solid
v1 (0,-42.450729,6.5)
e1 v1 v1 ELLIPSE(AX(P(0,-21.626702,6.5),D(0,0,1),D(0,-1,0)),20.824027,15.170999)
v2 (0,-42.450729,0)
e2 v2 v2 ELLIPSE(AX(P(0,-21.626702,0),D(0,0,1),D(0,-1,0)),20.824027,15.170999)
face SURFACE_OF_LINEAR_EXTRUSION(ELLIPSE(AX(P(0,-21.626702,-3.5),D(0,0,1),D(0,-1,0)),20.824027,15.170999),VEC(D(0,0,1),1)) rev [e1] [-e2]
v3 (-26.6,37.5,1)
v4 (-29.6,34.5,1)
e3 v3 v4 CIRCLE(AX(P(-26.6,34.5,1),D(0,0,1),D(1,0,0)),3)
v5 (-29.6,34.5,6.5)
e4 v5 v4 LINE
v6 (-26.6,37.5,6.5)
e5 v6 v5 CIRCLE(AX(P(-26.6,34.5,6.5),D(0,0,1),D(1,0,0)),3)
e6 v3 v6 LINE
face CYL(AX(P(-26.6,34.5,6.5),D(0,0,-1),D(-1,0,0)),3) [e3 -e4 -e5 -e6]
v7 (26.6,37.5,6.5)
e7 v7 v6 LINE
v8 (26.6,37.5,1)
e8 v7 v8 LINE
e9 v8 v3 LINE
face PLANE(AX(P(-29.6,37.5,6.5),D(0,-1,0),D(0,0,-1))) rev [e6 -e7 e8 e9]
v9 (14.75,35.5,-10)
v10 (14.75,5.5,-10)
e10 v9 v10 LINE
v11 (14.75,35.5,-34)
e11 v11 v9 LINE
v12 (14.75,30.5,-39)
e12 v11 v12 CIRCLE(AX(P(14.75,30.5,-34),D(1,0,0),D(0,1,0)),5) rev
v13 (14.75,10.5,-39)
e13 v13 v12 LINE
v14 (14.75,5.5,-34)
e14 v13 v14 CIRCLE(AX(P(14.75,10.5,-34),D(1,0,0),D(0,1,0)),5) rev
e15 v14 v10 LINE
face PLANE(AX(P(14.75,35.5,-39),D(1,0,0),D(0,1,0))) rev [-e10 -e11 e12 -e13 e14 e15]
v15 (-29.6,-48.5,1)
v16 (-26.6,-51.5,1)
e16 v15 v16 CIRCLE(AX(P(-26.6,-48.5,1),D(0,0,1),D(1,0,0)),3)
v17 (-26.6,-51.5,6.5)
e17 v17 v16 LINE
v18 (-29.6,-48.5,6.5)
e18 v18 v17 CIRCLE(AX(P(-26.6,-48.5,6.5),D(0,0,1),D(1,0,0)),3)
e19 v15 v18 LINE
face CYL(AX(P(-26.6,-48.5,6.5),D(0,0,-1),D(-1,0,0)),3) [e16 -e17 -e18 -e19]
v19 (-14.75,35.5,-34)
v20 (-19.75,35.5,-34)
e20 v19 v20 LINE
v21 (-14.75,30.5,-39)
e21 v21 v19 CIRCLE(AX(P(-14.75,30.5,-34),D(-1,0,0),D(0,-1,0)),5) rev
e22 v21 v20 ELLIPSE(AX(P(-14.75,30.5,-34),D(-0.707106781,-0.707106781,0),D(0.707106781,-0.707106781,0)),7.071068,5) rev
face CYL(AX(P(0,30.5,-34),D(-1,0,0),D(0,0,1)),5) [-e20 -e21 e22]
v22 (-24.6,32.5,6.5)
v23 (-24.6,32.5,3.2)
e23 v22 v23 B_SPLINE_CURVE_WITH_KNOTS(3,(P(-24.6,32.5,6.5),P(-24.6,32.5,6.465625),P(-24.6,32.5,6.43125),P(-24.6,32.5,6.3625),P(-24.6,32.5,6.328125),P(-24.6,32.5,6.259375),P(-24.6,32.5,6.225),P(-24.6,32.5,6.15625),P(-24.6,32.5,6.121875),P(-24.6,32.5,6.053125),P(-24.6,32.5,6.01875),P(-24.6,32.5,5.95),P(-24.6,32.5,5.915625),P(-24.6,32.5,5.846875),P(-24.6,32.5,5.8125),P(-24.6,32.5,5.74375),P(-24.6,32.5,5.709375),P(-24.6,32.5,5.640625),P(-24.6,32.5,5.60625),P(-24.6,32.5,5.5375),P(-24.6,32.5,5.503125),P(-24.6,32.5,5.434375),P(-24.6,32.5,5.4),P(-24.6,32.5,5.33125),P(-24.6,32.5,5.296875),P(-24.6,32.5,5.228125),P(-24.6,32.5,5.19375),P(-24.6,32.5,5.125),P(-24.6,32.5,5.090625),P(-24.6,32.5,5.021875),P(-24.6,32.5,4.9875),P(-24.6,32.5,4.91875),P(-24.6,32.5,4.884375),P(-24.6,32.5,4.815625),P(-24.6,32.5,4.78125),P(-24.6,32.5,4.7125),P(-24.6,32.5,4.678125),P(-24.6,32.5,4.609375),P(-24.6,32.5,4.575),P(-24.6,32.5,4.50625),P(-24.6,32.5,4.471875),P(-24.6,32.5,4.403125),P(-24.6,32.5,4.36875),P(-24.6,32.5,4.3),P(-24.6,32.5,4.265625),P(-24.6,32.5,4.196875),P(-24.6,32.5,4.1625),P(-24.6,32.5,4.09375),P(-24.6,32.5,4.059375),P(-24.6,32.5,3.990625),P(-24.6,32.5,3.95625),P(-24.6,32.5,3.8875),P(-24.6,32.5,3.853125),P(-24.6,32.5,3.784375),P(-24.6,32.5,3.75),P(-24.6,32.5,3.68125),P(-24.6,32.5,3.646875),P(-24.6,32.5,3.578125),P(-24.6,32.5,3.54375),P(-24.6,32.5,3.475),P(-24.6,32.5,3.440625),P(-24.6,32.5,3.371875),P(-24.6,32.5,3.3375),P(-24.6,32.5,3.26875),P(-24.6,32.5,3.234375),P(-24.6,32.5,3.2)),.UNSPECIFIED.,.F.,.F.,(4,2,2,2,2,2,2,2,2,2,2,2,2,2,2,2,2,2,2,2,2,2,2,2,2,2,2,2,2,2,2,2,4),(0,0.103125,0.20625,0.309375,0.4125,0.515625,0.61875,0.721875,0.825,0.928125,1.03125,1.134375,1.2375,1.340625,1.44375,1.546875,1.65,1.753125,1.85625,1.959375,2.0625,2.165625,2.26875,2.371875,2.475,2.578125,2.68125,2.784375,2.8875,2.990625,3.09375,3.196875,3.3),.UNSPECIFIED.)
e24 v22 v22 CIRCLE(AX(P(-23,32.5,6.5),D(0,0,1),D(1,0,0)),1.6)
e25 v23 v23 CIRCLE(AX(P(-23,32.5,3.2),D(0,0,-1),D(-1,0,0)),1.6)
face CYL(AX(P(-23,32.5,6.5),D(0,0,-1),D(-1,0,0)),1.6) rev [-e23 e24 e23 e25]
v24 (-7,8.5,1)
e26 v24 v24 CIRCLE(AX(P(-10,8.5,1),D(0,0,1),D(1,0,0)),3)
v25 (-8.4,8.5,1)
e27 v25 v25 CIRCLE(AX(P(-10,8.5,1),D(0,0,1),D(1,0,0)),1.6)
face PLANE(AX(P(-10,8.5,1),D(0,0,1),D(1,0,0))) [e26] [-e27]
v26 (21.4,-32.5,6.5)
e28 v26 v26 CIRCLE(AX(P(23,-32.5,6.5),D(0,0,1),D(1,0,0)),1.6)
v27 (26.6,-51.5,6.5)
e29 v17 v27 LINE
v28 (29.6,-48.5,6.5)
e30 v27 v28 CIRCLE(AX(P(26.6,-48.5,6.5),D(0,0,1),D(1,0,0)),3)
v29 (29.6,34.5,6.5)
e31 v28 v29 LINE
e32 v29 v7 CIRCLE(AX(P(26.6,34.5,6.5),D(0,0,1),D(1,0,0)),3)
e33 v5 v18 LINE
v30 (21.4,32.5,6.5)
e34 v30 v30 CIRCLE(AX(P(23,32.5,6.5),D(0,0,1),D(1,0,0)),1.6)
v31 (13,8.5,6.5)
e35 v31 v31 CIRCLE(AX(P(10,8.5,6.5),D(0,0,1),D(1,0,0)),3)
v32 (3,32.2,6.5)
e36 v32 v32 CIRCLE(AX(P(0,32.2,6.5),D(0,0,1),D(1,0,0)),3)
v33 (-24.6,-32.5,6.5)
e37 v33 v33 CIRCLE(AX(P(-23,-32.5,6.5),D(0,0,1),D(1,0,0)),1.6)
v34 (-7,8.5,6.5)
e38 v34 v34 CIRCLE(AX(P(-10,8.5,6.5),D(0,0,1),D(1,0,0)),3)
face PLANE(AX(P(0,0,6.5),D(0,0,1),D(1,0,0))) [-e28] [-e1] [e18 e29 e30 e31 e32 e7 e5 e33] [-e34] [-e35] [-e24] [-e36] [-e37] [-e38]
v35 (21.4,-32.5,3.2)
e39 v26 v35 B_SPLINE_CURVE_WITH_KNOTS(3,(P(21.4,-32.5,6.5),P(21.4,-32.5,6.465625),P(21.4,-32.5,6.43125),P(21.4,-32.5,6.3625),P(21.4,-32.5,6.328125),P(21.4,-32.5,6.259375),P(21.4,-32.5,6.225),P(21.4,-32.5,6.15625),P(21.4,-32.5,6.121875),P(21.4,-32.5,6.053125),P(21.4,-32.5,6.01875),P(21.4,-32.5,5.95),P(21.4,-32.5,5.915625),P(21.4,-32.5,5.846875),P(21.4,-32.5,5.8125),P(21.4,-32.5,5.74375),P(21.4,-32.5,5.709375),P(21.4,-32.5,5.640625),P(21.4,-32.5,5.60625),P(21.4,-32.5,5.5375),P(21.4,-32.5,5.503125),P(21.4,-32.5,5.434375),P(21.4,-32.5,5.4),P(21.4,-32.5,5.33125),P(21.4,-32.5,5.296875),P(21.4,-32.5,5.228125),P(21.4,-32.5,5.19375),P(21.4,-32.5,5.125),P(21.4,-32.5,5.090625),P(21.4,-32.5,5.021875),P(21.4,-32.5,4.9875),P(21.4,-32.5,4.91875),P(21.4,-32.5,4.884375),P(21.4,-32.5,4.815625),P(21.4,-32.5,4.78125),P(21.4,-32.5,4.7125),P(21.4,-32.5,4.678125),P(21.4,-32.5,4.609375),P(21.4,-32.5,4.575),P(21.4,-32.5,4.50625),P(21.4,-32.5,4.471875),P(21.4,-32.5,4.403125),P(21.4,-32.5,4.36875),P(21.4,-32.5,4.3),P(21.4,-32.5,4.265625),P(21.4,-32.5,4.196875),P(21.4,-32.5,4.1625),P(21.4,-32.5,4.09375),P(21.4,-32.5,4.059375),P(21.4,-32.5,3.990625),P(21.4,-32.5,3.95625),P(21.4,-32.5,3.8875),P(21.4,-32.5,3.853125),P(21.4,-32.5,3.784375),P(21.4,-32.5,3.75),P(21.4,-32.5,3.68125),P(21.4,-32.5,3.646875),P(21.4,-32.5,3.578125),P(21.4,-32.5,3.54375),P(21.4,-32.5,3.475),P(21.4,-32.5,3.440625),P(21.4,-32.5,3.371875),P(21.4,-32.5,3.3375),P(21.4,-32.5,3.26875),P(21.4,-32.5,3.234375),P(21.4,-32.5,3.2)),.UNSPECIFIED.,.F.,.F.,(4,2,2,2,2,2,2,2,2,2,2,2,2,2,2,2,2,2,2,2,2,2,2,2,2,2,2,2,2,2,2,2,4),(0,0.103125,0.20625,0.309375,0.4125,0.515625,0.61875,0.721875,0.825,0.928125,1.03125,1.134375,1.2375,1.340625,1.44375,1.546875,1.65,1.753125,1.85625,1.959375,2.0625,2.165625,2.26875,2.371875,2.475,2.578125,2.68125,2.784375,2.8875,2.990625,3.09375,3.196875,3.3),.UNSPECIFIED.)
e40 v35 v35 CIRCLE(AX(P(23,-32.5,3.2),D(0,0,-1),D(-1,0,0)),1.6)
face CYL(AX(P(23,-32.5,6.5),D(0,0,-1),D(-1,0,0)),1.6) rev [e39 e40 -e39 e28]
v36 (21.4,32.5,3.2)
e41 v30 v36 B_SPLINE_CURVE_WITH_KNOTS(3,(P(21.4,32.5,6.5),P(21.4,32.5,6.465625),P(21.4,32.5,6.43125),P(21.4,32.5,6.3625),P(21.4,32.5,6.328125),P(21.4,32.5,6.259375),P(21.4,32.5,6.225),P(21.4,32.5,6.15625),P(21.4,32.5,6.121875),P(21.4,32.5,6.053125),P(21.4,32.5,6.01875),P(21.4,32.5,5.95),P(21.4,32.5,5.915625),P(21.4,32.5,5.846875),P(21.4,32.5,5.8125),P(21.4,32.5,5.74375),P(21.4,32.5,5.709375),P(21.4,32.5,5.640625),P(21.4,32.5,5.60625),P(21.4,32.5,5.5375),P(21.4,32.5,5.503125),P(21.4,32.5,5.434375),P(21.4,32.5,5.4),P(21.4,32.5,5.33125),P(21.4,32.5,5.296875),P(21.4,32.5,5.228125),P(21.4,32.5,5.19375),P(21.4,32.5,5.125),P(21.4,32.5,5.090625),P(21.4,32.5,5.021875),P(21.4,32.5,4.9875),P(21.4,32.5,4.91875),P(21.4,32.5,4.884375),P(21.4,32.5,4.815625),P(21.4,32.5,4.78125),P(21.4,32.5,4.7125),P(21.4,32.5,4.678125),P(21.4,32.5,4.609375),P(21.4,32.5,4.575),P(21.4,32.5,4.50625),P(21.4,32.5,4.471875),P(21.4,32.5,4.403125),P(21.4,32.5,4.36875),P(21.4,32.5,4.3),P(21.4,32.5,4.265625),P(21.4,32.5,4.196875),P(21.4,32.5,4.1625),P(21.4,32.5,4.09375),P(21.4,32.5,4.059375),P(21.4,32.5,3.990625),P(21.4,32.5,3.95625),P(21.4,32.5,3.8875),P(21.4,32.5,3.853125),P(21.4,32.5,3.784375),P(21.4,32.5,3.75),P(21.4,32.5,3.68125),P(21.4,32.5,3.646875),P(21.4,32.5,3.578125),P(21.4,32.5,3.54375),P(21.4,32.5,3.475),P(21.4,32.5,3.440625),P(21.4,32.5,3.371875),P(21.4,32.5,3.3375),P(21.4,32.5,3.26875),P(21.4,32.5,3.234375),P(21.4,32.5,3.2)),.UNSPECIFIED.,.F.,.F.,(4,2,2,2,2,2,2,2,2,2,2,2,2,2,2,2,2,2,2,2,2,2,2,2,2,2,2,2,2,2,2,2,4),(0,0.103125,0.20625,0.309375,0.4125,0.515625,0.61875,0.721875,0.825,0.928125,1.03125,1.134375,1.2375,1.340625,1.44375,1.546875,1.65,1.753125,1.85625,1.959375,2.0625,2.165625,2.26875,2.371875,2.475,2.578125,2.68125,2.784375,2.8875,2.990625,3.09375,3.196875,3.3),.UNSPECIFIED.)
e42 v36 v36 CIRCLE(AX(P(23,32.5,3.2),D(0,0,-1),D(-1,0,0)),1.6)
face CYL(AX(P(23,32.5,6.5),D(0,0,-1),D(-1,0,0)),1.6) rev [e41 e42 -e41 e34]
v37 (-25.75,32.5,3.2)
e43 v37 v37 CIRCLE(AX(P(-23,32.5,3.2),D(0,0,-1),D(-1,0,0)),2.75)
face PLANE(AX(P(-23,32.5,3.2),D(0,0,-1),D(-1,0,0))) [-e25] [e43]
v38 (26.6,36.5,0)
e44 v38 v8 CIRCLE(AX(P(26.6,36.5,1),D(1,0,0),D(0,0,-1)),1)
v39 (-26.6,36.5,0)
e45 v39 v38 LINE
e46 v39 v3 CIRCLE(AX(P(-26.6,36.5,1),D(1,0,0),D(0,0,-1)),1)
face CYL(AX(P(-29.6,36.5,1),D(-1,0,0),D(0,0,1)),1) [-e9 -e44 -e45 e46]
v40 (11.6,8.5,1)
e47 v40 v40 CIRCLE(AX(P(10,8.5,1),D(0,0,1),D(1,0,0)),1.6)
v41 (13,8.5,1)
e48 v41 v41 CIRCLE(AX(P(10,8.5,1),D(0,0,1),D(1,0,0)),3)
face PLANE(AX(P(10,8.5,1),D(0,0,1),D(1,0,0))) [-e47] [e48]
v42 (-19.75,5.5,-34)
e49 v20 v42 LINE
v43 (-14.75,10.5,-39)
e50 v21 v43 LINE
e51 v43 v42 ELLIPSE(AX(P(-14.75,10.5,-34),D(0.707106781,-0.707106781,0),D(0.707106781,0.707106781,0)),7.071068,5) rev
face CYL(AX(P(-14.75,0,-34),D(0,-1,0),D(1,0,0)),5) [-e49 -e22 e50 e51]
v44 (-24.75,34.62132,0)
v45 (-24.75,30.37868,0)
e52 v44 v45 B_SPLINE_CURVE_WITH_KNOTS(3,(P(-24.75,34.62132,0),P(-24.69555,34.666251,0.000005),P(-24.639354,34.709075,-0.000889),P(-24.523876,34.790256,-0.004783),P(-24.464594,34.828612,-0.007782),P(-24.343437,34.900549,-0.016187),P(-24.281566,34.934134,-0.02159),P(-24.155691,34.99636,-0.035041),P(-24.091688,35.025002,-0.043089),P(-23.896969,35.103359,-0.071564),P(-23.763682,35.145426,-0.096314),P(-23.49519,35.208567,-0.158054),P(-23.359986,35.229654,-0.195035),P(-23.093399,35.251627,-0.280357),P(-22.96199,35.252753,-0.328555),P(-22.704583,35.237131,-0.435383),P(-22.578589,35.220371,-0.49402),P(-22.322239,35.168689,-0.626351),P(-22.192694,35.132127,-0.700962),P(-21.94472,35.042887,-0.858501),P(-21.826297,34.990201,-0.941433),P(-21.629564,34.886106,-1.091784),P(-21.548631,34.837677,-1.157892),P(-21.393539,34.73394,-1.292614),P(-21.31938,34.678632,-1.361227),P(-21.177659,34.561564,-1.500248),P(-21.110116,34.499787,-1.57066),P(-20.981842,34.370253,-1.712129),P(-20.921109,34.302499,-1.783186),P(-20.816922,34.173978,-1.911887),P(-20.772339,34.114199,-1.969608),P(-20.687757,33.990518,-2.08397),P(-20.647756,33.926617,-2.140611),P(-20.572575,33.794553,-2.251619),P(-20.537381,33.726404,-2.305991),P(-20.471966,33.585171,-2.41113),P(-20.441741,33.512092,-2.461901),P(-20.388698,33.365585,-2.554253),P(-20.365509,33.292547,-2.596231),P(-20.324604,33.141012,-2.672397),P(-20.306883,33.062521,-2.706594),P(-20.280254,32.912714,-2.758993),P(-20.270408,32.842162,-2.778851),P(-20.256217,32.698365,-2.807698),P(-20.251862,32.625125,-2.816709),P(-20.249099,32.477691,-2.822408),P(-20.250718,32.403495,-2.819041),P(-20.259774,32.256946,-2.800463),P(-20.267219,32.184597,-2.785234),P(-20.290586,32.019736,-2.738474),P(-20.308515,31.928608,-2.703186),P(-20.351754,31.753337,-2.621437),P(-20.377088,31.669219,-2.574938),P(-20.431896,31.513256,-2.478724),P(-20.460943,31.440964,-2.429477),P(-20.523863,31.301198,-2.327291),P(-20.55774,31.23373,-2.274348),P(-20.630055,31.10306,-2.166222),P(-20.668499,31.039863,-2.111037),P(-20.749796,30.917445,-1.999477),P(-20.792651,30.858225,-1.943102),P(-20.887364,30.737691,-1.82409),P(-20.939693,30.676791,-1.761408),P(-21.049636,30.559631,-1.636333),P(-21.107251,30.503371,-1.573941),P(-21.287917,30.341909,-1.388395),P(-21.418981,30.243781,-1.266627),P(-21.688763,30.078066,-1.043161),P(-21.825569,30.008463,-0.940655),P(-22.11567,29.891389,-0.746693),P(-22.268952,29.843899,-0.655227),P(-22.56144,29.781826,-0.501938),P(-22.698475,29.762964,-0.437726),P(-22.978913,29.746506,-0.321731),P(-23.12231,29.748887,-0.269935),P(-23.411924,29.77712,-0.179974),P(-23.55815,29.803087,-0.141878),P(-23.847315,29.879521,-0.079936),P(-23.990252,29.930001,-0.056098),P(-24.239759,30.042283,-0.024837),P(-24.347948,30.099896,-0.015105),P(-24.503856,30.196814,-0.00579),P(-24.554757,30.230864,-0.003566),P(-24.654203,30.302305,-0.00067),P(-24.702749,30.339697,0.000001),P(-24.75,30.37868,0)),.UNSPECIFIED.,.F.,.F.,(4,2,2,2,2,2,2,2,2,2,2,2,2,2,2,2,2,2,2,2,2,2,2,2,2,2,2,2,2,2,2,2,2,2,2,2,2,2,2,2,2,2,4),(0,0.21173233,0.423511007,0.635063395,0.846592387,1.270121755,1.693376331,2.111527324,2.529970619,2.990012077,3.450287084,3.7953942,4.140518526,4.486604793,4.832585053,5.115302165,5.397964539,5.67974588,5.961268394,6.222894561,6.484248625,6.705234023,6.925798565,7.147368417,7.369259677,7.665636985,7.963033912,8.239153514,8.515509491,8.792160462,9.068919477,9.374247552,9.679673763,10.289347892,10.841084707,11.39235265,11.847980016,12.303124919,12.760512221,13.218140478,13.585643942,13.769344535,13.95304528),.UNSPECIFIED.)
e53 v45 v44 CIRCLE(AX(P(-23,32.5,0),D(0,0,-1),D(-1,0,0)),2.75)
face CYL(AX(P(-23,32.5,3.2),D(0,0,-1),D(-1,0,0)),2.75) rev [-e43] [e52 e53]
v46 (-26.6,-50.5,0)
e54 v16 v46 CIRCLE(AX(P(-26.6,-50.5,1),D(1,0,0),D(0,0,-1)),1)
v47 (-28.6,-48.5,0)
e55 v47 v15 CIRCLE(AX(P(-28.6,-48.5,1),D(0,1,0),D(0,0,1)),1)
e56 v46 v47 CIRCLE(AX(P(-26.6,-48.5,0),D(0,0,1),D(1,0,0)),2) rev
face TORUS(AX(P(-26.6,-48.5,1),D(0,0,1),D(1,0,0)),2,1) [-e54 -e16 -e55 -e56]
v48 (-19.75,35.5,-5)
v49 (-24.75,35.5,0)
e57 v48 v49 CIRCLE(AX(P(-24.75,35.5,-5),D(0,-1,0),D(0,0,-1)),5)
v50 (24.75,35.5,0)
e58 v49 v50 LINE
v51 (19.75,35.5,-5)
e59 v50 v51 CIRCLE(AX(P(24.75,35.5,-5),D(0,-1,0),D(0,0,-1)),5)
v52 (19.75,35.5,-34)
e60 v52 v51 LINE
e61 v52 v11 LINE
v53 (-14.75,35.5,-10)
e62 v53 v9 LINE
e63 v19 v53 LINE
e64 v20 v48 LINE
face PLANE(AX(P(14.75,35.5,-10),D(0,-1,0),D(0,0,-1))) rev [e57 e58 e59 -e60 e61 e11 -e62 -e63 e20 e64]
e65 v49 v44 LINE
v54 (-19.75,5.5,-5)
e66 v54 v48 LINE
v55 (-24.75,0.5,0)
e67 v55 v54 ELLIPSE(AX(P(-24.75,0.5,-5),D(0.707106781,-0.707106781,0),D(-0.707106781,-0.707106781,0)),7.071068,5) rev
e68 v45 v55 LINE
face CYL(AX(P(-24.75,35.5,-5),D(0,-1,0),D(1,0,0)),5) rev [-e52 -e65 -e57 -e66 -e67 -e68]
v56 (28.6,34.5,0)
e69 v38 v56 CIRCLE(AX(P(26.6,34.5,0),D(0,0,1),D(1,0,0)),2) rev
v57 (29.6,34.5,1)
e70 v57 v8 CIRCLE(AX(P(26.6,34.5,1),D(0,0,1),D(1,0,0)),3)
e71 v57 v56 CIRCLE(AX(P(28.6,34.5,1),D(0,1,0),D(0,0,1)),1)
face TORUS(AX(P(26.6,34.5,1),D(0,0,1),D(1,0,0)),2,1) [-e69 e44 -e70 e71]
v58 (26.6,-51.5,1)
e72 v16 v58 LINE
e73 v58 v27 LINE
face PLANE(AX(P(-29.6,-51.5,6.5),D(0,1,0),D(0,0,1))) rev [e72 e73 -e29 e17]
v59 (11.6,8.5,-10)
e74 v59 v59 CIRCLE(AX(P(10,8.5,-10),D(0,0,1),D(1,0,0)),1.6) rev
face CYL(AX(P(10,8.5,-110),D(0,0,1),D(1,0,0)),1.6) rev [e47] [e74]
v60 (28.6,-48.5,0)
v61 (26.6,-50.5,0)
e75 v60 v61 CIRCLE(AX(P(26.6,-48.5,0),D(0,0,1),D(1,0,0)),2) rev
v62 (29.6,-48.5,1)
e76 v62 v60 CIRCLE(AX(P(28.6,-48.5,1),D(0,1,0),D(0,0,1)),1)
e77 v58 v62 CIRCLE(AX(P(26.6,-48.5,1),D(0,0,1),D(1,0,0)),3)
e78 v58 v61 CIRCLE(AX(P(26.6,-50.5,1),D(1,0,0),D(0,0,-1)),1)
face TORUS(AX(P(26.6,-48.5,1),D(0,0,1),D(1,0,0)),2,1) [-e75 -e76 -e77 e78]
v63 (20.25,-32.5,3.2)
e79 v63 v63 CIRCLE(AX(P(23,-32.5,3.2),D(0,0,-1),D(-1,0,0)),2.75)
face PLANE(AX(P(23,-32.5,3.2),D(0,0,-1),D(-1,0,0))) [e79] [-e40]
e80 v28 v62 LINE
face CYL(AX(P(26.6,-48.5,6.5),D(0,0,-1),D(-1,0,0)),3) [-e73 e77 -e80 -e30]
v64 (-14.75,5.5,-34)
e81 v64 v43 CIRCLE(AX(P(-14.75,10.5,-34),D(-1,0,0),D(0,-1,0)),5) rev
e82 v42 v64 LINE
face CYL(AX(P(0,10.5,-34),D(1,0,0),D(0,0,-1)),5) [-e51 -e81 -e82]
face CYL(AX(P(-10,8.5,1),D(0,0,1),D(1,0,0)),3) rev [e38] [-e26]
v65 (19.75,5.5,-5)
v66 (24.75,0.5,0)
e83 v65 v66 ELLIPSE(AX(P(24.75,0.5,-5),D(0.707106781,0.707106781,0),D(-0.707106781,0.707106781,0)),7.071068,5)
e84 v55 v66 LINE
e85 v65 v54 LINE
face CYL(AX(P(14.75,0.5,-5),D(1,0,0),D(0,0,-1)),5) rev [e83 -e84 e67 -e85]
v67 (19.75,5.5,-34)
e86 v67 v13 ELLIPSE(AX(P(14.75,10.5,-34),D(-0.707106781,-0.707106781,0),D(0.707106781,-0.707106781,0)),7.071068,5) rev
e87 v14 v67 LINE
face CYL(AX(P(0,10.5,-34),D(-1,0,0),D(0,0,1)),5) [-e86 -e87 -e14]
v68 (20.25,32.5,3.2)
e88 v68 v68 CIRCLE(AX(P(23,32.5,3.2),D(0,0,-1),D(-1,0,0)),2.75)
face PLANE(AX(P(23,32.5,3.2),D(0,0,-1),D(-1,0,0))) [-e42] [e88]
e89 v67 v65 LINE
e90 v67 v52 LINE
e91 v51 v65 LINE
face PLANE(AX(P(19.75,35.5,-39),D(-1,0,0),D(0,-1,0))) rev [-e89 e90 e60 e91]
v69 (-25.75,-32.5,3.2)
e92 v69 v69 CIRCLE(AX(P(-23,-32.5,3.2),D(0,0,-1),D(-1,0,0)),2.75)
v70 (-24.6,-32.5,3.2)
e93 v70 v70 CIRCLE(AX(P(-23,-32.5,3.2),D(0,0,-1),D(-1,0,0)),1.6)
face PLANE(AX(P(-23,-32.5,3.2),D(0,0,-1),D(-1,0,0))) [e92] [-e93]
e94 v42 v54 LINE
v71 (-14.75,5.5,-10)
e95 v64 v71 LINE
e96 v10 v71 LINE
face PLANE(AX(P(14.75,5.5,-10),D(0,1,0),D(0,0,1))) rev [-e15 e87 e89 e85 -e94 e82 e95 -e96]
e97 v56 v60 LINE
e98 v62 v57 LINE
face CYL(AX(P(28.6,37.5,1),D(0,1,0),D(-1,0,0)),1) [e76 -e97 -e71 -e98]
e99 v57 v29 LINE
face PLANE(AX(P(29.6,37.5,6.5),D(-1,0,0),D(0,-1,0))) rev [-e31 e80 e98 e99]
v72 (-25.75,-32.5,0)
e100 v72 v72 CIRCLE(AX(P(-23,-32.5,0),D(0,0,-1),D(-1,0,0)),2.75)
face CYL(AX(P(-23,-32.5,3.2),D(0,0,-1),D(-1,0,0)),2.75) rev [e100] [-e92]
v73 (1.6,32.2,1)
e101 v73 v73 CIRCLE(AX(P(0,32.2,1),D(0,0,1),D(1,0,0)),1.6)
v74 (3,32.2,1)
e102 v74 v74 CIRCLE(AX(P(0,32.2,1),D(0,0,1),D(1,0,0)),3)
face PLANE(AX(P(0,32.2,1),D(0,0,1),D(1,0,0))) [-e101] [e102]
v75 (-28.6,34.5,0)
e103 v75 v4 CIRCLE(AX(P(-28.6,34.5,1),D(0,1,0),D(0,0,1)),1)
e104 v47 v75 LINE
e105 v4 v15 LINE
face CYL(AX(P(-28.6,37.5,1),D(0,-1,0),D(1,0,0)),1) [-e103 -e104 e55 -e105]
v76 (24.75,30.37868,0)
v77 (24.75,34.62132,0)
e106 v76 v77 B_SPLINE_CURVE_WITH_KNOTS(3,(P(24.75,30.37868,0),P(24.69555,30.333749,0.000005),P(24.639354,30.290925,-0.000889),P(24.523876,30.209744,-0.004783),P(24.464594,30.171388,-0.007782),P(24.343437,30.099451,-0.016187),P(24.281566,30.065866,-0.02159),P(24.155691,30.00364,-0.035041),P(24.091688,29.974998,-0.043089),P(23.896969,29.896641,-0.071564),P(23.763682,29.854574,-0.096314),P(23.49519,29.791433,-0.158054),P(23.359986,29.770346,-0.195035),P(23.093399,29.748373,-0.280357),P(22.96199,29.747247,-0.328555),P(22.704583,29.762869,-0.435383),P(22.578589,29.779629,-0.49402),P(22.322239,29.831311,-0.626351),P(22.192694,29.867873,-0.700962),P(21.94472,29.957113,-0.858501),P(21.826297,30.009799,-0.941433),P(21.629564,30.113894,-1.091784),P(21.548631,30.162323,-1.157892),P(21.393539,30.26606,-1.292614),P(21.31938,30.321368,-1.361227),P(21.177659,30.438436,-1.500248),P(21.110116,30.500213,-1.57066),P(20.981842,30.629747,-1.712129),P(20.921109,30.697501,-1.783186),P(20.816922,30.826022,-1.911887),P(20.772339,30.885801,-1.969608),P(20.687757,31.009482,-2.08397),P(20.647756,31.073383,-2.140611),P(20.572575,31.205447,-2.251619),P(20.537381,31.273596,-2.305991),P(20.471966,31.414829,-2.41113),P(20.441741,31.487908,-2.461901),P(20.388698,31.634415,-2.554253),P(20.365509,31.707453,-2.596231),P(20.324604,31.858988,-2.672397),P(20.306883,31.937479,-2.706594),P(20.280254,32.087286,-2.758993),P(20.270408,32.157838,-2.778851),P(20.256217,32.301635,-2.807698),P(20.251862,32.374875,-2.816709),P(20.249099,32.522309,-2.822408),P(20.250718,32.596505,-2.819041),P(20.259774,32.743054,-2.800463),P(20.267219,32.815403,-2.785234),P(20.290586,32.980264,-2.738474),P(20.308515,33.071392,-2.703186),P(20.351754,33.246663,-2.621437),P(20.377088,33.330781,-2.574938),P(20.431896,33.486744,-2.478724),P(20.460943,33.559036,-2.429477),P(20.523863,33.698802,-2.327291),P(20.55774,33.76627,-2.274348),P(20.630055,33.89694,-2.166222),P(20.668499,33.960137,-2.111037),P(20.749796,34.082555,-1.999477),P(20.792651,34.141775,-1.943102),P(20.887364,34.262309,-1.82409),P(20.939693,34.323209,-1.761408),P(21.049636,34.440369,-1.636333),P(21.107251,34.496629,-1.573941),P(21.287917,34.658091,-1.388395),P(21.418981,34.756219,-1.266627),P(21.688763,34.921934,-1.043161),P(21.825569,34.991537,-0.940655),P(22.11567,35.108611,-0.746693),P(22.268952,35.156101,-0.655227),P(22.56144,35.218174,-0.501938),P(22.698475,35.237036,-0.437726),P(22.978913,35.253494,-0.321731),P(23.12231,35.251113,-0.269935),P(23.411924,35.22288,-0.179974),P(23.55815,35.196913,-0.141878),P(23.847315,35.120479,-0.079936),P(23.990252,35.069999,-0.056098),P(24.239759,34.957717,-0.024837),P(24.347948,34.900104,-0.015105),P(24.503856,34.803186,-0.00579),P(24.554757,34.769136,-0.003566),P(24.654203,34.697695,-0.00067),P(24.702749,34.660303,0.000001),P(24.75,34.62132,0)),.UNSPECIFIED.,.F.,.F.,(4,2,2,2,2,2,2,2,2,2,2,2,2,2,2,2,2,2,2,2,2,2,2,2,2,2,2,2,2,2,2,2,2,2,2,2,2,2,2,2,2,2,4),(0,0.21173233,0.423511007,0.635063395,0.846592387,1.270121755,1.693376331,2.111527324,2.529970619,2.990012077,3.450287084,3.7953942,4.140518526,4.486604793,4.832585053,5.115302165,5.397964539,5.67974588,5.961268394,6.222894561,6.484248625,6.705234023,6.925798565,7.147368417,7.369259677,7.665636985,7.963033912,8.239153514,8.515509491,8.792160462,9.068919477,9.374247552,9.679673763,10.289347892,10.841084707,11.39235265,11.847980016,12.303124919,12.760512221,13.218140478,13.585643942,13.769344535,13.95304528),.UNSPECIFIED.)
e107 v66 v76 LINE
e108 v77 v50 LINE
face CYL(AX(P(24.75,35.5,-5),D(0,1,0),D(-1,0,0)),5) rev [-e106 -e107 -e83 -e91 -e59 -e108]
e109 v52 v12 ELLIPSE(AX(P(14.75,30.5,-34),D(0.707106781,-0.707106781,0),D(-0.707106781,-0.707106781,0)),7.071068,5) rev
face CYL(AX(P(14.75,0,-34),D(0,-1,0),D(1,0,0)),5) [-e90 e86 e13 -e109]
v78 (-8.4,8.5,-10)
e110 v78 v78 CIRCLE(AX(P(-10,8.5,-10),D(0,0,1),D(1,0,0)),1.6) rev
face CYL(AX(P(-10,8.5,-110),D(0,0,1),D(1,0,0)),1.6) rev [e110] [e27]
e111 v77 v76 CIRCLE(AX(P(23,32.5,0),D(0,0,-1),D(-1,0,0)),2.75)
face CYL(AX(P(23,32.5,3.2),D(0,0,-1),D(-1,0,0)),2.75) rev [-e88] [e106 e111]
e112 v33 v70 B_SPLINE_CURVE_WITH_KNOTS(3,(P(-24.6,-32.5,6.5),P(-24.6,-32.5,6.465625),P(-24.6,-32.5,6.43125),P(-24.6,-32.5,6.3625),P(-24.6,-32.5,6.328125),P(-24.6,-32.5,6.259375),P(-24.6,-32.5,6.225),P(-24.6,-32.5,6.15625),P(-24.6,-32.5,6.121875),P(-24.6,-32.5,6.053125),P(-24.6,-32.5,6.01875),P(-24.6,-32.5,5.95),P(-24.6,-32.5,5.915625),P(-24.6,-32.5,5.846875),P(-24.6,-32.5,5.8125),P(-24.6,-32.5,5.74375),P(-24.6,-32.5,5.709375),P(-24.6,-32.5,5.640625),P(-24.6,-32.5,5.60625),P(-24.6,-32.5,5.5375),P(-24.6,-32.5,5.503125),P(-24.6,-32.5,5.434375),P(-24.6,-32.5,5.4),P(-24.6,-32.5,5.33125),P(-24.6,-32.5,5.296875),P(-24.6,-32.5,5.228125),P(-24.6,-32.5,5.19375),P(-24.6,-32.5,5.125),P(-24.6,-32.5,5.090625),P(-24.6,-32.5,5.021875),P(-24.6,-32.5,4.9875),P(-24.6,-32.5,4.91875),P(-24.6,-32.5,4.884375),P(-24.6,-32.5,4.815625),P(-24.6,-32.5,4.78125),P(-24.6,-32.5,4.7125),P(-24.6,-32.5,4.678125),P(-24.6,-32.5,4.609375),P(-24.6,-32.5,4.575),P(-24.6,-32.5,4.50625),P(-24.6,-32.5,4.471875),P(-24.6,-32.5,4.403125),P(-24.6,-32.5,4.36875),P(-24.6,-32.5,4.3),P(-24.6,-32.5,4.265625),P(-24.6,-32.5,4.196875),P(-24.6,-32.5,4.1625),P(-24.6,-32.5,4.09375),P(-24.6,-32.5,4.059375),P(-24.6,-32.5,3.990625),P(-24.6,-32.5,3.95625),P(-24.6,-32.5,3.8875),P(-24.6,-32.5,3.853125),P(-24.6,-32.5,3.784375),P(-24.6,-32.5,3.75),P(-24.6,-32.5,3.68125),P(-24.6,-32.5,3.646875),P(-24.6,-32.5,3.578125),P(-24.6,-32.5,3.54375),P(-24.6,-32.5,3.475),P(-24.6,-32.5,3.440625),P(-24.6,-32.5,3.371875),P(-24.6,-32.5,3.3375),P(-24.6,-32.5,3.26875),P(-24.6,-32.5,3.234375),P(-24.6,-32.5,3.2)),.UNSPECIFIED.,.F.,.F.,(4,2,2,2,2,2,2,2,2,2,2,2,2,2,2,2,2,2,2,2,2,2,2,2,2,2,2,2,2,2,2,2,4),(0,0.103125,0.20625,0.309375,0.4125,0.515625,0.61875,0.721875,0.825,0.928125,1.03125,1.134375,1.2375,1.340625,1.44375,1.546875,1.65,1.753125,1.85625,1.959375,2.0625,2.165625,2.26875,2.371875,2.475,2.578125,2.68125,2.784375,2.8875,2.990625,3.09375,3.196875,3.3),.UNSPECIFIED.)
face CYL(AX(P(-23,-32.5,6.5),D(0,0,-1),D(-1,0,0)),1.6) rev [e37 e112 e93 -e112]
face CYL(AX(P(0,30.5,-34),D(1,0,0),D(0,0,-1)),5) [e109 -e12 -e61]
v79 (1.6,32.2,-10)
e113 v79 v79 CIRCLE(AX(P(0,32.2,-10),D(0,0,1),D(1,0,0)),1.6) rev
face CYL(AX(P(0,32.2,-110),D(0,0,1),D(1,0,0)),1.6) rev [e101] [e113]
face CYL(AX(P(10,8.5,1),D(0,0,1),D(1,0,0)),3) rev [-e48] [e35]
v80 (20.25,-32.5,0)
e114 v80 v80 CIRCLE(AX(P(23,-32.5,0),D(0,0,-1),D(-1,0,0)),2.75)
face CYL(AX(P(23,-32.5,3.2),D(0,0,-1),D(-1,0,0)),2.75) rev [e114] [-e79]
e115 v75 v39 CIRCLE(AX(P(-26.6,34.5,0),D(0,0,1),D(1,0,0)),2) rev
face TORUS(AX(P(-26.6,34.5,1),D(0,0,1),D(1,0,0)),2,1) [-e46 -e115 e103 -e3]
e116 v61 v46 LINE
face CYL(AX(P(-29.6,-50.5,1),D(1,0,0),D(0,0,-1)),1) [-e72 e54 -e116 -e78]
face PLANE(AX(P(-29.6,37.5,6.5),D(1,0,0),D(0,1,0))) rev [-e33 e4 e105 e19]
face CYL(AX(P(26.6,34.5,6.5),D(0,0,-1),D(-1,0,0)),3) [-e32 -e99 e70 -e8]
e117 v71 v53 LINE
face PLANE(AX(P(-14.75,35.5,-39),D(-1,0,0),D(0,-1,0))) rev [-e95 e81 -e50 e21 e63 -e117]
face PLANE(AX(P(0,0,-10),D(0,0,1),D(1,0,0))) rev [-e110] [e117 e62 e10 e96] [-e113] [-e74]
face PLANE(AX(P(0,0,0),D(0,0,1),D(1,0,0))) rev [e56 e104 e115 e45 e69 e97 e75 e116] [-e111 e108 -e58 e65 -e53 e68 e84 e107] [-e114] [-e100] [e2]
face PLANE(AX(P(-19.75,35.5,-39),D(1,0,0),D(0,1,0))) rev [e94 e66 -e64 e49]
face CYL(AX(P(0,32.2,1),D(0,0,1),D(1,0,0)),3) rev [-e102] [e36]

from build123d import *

# Parameters (mm, degrees)
SKETCH_1_W               = 59.2
SKETCH_1_H               = 89
SKETCH_1_R               = 1.6
EXTRUDE_1_DEPTH          = 6.5
SKETCH_2_W               = 29.5
SKETCH_2_H               = 30
EXTRUDE_2_DEPTH          = 10
SKETCH_3_W               = 5
SKETCH_3_H               = 30
EXTRUDE_3_DEPTH          = 39
SKETCH_4_R               = 2.75
CUT_EXTRUDE_1_DEPTH      = 3.2
CUT_EXTRUDE_2_DEPTH      = 100
CUT_EXTRUDE_2_DEPTH_BACK = 100
SKETCH_5_R               = 1.6
SKETCH_6_R               = 3
CUT_EXTRUDE_3_DEPTH      = 5.5
FILLET_1_R               = 3
FILLET_2_R               = 5
FILLET_5_R               = 1
FILLET_6_R               = 5
SKETCH_7_RX              = 20.824026905
SKETCH_7_RY              = 15.170998686
CUT_EXTRUDE_4_DEPTH      = 10


# Some blends are built 0.0001 mm under size
with BuildPart() as part:
    # 草图1 → 凸台-拉伸1 (new body)
    with BuildSketch(Plane.XY):
        with Locations((0, -7)):
            Rectangle(SKETCH_1_W, SKETCH_1_H)
        with Locations(Location((-23, -32.5, 0), (0, 0, 180))):
            Circle(SKETCH_1_R, mode=Mode.SUBTRACT)
        with Locations(Location((23, -32.5, 0), (0, 0, 180))):
            Circle(SKETCH_1_R, mode=Mode.SUBTRACT)
        with Locations(Location((23, 32.5, 0), (0, 0, 180))):
            Circle(SKETCH_1_R, mode=Mode.SUBTRACT)
        with Locations(Location((-23, 32.5, 0), (0, 0, 180))):
            Circle(SKETCH_1_R, mode=Mode.SUBTRACT)
    extrude(amount=EXTRUDE_1_DEPTH)

    # 草图2 → 凸台-拉伸2 (add)
    with BuildSketch(Plane(origin=(0, 0, 0), x_dir=(-1, 0, 0), z_dir=(0, 0, -1))):
        with Locations((0, 20.5)):
            Rectangle(SKETCH_2_W, SKETCH_2_H)
    extrude(amount=EXTRUDE_2_DEPTH)

    # 草图3 → 凸台-拉伸3 (add)
    with BuildSketch(Plane(origin=(0, 0, 0), x_dir=(-1, 0, 0), z_dir=(0, 0, -1))):
        with Locations((17.25, 20.5)):
            Rectangle(SKETCH_3_W, SKETCH_3_H)
        with Locations((-17.25, 20.5)):
            Rectangle(SKETCH_3_W, SKETCH_3_H)
    extrude(amount=EXTRUDE_3_DEPTH)

    # 草图4 → 切除-拉伸1 (cut)
    with BuildSketch(Plane(origin=(0, 0, 0), x_dir=(-1, 0, 0), z_dir=(0, 0, -1))):
        with Locations((23, -32.5)):
            Circle(SKETCH_4_R)
        with Locations((-23, -32.5)):
            Circle(SKETCH_4_R)
        with Locations((23, 32.5)):
            Circle(SKETCH_4_R)
        with Locations((-23, 32.5)):
            Circle(SKETCH_4_R)
    extrude(amount=-CUT_EXTRUDE_1_DEPTH, mode=Mode.SUBTRACT)

    # 草图5 → 切除-拉伸2 (cut, two sides: drawn at the far end of the back side and taken through both)
    with BuildSketch(Plane(origin=(0, 0, -10), x_dir=(-1, 0, 0), z_dir=(0, 0, -1)).offset(-CUT_EXTRUDE_2_DEPTH_BACK)):
        with Locations(Location((0, 32.2, 0), (0, 0, 180))):
            Circle(SKETCH_5_R)
        with Locations(Location((10, 8.5, 0), (0, 0, 180))):
            Circle(SKETCH_5_R)
        with Locations(Location((-10, 8.5, 0), (0, 0, 180))):
            Circle(SKETCH_5_R)
    extrude(amount=CUT_EXTRUDE_2_DEPTH + CUT_EXTRUDE_2_DEPTH_BACK, mode=Mode.SUBTRACT)

    # 草图6 → 切除-拉伸3 (cut)
    with BuildSketch(Plane.XY.offset(6.5)):
        with Locations((10, 8.5)):
            Circle(SKETCH_6_R)
        with Locations((-10, 8.5)):
            Circle(SKETCH_6_R)
        with Locations((0, 32.2)):
            Circle(SKETCH_6_R)
    extrude(amount=-CUT_EXTRUDE_3_DEPTH, mode=Mode.SUBTRACT)

    # 圆角1
    fillet_1_edges = [part.edges().sort_by_distance(p)[0] for p in [
        (29.6, -51.5, 3.25),
        (-29.6, -51.5, 3.25),
        (-29.6, 37.5, 3.25),
        (29.6, 37.5, 3.25),
    ]]
    fillet(fillet_1_edges, radius=FILLET_1_R)

    # 圆角2
    # the kernel refuses this fillet: 5 mm, written as the material it adds along each edge
    with BuildSketch(Plane(origin=(-19.75, 5.5, 0), x_dir=(0, -1, 0), z_dir=(1, 0, 0))) as fillet_2_piece_1:
        with BuildLine():
            CenterArc((FILLET_2_R, FILLET_2_R), FILLET_2_R, 180, 90)
            Line((0, FILLET_2_R), (0, 0))
            Line((0, 0), (FILLET_2_R, 0))
        make_face()
    extrude(amount=39.5)
    with BuildSketch(Plane(origin=(-19.75, 35.5, 0), x_dir=(-1, 0, 0), z_dir=(0, -1, 0))) as fillet_2_piece_2_section:
        with BuildLine():
            CenterArc((FILLET_2_R, FILLET_2_R), FILLET_2_R, 180, 90)
            Line((0, FILLET_2_R), (0, 0))
            Line((0, 0), (FILLET_2_R, 0))
        make_face()
    fillet_2_piece_2 = extrude(amount=30, mode=Mode.PRIVATE)
    fillet_2_piece_2 = fillet_2_piece_2 - Plane(origin=(-23, 32.5, -1.1830281), x_dir=(-1, 0, 0), z_dir=(0, 0, -1)) * Cylinder(2.75, 80, mode=Mode.PRIVATE)
    add(fillet_2_piece_2)
    with BuildSketch(Plane(origin=(19.75, 35.5, 0), x_dir=(1, 0, 0), z_dir=(0, -1, 0))) as fillet_2_piece_3_section:
        with BuildLine():
            CenterArc((FILLET_2_R, -FILLET_2_R), FILLET_2_R, 90, 90)
            Line((0, -FILLET_2_R), (0, 0))
            Line((0, 0), (FILLET_2_R, 0))
        make_face()
    fillet_2_piece_3 = extrude(amount=30, mode=Mode.PRIVATE)
    fillet_2_piece_3 = fillet_2_piece_3 - Plane(origin=(23, 32.5, -1.183032565), x_dir=(-1, 0, 0), z_dir=(0, 0, -1)) * Cylinder(2.75, 80, mode=Mode.PRIVATE)
    add(fillet_2_piece_3)
    with BuildSketch(Plane(origin=(-32.25, 5.5, 0), x_dir=(0, -1, 0), z_dir=(1, 0, 0))) as fillet_2_piece_4a_section:
        with BuildLine():
            CenterArc((FILLET_2_R, FILLET_2_R), FILLET_2_R, 180, 90)
            Line((0, FILLET_2_R), (0, 0))
            Line((0, 0), (FILLET_2_R, 0))
        make_face()
    fillet_2_piece_4a = extrude(amount=52, mode=Mode.PRIVATE)
    fillet_2_piece_4a = split(fillet_2_piece_4a, bisect_by=Plane(origin=(-29.6, 4.368024429, -1.131975571), z_dir=(1, 0, 0)), keep=Keep.TOP, mode=Mode.PRIVATE)
    fillet_2_piece_4a = split(fillet_2_piece_4a, bisect_by=Plane(origin=(-19.75, 4.368024429, -1.131975571), z_dir=(-1, 0, 0)), keep=Keep.TOP, mode=Mode.PRIVATE)
    with BuildSketch(Plane(origin=(-19.75, 35.5, 0), x_dir=(-1, 0, 0), z_dir=(0, -1, 0))) as fillet_2_piece_4b_section:
        with BuildLine():
            CenterArc((FILLET_2_R, FILLET_2_R), FILLET_2_R, 180, 90)
            Line((0, FILLET_2_R), (0, 0))
            Line((0, 0), (FILLET_2_R, 0))
        make_face()
    fillet_2_piece_4b = extrude(amount=42.5, mode=Mode.PRIVATE)
    fillet_2_piece_4b = split(fillet_2_piece_4b, bisect_by=Plane(origin=(-20.881975571, 5.5, -1.131975571), z_dir=(0, -1, 0)), keep=Keep.TOP, mode=Mode.PRIVATE)
    fillet_2_piece_4 = fillet_2_piece_4a & fillet_2_piece_4b
    add(fillet_2_piece_4)
    with BuildSketch(Plane(origin=(-19.75, 5.5, 0), x_dir=(0, -1, 0), z_dir=(1, 0, 0))) as fillet_2_piece_5a_section:
        with BuildLine():
            CenterArc((FILLET_2_R, FILLET_2_R), FILLET_2_R, 180, 90)
            Line((0, FILLET_2_R), (0, 0))
            Line((0, 0), (FILLET_2_R, 0))
        make_face()
    fillet_2_piece_5a = extrude(amount=52, mode=Mode.PRIVATE)
    fillet_2_piece_5a = split(fillet_2_piece_5a, bisect_by=Plane(origin=(29.6, 4.368024429, -1.131975571), z_dir=(-1, 0, 0)), keep=Keep.TOP, mode=Mode.PRIVATE)
    fillet_2_piece_5a = split(fillet_2_piece_5a, bisect_by=Plane(origin=(19.75, 4.368024429, -1.131975571), z_dir=(1, 0, 0)), keep=Keep.TOP, mode=Mode.PRIVATE)
    with BuildSketch(Plane(origin=(19.75, 35.5, 0), x_dir=(1, 0, 0), z_dir=(0, -1, 0))) as fillet_2_piece_5b_section:
        with BuildLine():
            CenterArc((FILLET_2_R, -FILLET_2_R), FILLET_2_R, 90, 90)
            Line((0, -FILLET_2_R), (0, 0))
            Line((0, 0), (FILLET_2_R, 0))
        make_face()
    fillet_2_piece_5b = extrude(amount=42.5, mode=Mode.PRIVATE)
    fillet_2_piece_5b = split(fillet_2_piece_5b, bisect_by=Plane(origin=(20.881975571, 5.5, -1.131975571), z_dir=(0, -1, 0)), keep=Keep.TOP, mode=Mode.PRIVATE)
    fillet_2_piece_5 = fillet_2_piece_5a & fillet_2_piece_5b
    add(fillet_2_piece_5)

    # 圆角5
    fillet_5_edges = [part.edges().sort_by_distance(p)[0] for p in [
        (-29.6, -7, 0),
        (29.6, -7, 0),
        (0, -51.5, 0),
        (0, 37.5, 0),
        (-28.721320344, -50.621320344, 0),
        (28.721320344, -50.621320344, 0),
        (28.721320344, 36.621320344, 0),
        (-28.721320344, 36.621320344, 0),
    ]]
    fillet(fillet_5_edges, radius=FILLET_5_R)

    # 圆角6
    fillet_6_edges = [part.edges().sort_by_distance(p)[0] for p in [
        (-17.25, 5.5, -39),
        (-19.75, 20.5, -39),
        (-17.25, 35.5, -39),
        (17.25, 35.5, -39),
        (19.75, 20.5, -39),
        (17.25, 5.5, -39),
    ]]
    fillet(fillet_6_edges, radius=FILLET_6_R - 0.0001)  # a hair under: the kernel refuses the full size

    # 草图7 → 切除-拉伸4 (cut)
    with BuildSketch(Plane.XY.offset(6.5)):
        with Locations(Location((0, -21.62670202), (0, 0, -90))):
            Ellipse(SKETCH_7_RX, SKETCH_7_RY)
    extrude(amount=-CUT_EXTRUDE_4_DEPTH, mode=Mode.SUBTRACT)


solid = part.part
